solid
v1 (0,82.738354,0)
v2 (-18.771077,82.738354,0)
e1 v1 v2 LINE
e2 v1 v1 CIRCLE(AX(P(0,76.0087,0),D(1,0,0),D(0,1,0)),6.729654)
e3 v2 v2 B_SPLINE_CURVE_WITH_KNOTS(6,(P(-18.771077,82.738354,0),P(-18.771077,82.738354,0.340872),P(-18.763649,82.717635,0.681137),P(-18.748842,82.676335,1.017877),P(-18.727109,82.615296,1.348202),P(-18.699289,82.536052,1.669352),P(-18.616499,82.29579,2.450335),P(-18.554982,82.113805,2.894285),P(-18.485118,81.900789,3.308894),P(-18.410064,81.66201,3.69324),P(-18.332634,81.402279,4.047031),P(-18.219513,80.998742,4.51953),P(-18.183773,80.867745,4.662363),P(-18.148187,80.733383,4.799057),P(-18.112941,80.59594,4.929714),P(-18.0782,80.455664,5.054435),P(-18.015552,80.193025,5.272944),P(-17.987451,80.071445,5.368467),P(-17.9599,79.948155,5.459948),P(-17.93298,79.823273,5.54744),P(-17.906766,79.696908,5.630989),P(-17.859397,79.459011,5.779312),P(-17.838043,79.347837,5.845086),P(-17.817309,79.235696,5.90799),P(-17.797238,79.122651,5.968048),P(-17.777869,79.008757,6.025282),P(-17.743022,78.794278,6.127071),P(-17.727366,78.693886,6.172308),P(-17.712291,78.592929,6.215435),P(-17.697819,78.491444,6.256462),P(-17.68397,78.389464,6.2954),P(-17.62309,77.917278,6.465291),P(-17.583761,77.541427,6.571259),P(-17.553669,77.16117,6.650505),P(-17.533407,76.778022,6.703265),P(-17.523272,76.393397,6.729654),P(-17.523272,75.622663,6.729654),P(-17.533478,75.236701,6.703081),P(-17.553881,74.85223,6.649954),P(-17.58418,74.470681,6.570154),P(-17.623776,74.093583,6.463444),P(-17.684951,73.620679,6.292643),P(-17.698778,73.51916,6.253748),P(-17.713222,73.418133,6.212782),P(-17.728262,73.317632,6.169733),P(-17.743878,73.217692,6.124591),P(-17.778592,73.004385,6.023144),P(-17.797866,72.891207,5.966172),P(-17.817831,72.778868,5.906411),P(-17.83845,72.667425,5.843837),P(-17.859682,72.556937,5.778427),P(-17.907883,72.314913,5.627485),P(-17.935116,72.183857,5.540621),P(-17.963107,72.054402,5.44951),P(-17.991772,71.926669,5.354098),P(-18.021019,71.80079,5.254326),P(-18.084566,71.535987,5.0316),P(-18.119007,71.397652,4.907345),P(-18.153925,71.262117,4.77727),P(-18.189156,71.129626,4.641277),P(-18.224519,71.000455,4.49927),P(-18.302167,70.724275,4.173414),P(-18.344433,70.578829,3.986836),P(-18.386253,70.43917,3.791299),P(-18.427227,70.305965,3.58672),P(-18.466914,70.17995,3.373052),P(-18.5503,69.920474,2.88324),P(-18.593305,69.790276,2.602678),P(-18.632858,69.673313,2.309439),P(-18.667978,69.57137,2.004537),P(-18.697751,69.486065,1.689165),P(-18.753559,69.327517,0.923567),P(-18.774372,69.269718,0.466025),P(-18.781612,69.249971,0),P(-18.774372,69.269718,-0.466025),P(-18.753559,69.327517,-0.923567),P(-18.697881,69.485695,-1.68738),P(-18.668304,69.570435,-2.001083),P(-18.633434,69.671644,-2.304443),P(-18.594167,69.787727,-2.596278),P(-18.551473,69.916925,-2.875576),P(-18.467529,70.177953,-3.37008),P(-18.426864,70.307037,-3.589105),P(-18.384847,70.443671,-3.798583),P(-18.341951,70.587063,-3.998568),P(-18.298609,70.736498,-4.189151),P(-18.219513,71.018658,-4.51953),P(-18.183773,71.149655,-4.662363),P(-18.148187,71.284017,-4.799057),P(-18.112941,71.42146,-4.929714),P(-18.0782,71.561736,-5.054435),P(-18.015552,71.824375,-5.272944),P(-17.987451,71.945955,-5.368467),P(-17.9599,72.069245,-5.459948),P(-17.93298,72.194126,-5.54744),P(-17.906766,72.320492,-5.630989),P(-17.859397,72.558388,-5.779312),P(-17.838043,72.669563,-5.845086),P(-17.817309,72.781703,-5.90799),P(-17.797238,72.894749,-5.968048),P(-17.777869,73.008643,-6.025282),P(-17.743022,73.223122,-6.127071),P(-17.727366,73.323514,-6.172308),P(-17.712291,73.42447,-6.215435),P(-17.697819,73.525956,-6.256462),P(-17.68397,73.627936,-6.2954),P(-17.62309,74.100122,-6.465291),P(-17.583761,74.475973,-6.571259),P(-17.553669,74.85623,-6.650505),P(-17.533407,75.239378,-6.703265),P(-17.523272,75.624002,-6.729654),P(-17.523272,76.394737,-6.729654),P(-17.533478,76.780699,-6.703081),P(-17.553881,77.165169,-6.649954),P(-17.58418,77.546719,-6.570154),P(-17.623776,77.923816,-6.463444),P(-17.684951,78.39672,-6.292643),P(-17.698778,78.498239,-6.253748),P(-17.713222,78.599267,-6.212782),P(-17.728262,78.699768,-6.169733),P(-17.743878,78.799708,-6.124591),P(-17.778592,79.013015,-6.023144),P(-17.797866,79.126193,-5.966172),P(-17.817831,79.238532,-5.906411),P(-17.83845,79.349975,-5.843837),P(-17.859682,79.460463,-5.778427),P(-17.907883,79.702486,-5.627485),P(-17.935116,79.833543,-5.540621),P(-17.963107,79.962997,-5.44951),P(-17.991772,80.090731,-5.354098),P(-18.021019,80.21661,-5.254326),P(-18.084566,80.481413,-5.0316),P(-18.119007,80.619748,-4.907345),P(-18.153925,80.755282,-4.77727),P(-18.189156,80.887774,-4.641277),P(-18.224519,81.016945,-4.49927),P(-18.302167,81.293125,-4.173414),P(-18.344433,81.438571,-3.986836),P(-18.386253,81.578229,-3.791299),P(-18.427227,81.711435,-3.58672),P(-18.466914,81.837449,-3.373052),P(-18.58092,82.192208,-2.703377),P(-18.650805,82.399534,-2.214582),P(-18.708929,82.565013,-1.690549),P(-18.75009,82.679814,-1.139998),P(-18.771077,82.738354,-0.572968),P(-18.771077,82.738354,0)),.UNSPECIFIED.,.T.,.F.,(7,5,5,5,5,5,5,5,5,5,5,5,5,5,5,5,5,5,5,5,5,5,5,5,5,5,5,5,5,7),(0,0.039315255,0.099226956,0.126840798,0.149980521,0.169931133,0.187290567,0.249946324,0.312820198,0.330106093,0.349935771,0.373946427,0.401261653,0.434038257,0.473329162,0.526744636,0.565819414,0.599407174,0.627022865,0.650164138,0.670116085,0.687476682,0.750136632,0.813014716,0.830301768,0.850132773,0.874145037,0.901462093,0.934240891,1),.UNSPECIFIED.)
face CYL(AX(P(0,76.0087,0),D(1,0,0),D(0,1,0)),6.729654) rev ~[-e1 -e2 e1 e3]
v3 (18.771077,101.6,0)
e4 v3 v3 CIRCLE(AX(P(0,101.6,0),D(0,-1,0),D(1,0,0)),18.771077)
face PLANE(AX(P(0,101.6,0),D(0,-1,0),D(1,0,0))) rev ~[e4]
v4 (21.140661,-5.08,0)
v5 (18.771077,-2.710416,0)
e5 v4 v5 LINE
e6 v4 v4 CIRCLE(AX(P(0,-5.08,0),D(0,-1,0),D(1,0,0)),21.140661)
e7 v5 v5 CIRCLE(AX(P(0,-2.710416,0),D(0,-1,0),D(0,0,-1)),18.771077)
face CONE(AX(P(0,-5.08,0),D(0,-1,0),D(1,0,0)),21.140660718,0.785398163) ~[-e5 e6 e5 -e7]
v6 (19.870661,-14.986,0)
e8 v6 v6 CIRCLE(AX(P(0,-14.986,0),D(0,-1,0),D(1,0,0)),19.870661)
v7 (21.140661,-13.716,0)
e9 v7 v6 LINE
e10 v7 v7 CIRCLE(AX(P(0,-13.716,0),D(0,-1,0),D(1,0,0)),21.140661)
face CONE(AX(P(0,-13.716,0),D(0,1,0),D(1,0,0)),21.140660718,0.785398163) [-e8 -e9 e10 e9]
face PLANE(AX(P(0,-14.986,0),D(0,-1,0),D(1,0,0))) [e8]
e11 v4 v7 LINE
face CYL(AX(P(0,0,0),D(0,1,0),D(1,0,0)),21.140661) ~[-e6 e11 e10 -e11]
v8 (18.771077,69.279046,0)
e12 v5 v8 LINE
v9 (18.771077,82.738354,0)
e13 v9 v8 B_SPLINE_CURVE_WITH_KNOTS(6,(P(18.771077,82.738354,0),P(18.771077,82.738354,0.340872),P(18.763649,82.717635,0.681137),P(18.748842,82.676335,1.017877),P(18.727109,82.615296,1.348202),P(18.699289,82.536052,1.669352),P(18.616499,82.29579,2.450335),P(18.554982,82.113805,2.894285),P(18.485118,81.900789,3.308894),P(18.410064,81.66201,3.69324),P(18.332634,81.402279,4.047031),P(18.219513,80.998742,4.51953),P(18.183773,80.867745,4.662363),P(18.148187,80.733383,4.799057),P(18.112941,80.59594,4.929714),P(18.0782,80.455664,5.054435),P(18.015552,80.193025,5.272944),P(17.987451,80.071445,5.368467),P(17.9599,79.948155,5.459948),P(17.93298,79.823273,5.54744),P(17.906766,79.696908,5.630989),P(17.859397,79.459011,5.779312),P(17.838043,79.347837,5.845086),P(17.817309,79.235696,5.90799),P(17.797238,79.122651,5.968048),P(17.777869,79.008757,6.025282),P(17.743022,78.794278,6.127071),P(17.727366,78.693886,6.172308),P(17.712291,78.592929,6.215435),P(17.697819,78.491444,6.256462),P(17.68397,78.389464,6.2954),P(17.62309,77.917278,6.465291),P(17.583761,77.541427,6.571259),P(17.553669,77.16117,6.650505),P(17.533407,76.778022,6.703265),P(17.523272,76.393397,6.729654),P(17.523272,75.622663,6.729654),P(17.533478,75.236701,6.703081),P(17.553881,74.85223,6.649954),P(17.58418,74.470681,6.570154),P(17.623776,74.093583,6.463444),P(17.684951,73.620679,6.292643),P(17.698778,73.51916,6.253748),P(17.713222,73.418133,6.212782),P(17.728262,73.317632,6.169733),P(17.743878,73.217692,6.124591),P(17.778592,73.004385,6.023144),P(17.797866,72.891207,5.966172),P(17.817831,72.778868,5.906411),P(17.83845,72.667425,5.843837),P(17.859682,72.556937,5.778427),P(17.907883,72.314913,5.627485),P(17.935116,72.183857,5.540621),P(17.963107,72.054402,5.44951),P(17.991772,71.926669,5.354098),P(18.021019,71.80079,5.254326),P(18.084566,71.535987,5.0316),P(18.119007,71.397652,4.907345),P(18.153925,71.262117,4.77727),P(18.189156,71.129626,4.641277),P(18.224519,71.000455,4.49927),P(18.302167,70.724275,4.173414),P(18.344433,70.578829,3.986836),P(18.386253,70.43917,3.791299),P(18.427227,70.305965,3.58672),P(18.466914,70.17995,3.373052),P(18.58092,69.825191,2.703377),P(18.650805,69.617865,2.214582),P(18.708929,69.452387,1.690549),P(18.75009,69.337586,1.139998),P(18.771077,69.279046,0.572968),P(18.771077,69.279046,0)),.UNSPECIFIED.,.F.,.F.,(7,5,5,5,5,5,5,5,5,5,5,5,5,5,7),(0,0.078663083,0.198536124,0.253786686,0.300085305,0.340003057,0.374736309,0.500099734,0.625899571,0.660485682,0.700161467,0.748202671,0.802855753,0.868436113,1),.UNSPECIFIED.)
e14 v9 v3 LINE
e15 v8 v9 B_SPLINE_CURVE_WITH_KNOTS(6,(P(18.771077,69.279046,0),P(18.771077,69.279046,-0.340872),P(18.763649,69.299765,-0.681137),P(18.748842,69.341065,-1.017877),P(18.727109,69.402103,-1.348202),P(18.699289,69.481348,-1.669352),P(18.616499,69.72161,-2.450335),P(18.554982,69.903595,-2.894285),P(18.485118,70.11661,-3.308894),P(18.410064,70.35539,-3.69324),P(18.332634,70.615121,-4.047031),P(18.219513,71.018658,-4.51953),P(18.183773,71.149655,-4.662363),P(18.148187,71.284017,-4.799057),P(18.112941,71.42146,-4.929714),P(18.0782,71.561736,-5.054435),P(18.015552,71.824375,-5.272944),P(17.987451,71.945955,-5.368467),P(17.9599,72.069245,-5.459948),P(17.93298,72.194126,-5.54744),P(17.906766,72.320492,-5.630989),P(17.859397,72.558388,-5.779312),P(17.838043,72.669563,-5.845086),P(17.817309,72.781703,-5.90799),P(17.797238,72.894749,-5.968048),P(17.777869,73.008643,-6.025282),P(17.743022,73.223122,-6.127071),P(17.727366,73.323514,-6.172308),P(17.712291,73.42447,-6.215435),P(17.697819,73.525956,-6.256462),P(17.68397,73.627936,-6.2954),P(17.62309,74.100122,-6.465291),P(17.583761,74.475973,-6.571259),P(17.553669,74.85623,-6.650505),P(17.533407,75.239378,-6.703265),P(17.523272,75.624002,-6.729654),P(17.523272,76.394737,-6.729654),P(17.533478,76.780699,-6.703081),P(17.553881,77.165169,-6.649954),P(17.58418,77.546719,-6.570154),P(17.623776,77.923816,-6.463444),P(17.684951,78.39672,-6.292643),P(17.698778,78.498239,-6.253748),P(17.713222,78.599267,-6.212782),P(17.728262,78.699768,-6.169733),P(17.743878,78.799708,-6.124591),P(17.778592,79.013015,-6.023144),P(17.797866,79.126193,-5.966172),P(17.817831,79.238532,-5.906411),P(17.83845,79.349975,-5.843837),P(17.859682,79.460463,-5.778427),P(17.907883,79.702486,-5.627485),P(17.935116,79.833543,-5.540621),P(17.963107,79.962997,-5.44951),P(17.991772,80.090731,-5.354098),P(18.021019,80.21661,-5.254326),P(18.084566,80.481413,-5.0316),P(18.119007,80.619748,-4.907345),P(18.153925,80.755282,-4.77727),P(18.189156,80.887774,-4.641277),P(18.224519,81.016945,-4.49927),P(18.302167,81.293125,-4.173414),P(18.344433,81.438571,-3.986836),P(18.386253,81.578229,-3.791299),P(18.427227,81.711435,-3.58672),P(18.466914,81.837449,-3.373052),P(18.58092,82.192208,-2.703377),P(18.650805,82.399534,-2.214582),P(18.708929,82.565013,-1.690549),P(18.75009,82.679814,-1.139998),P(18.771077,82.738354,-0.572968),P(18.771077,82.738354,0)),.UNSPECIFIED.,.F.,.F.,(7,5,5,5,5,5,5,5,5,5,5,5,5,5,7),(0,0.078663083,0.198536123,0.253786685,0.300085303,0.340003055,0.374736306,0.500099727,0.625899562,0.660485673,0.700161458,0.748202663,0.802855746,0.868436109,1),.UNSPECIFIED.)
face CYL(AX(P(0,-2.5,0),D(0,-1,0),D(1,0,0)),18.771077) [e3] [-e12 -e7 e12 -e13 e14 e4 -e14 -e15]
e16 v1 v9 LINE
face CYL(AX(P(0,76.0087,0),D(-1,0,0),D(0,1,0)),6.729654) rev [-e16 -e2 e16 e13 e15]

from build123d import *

# Parameters (mm, degrees)
F0_R          = 18.7710767317
F1_DEPTH      = 101.6
F2_R          = 21.1406607176
F3_DEPTH      = 14.986
F4_S5_R       = 18.7710767317
F4_T6_DEPTH   = 32
F5_SIZE2      = 1.27
F5_SIZE       = 1.27
F6_R          = 6.7296542148
F7_DEPTH      = 47.498
F7_DEPTH_BACK = 25.4


# Not quite as in the source:
# - a fillet or chamfer that OpenCascade refuses, or shapes differently, is made with other operations: its cross-section is extruded or revolved along the edge and cut away or added


with BuildPart() as f1:
    # F0 (on Front) → F1 (new body)
    with BuildSketch(Plane.XZ):
        Circle(F0_R)
    extrude(amount=-F1_DEPTH)

    # F2 (on Front) → F3 (join)
    with BuildSketch(Plane.XZ):
        Circle(F2_R)
    extrude(amount=F3_DEPTH)

    # F4: chamfer of 5.08 on 1 edges, made by hand


with BuildPart() as f4_tool2:
    # F4_s3 → F4_t4 (revolve)
    with BuildSketch(Plane.XY):
        Polygon((21.1406607176, -5.08), (16.0606607176, 0), (21.1406607176, 0), align=None)
    revolve(axis=Axis((0, 0, 0), (0, -1, 0)))

    # F4_s5 → F4_t6 (cut, symmetric)
    with BuildSketch(Plane.XZ.offset(2.5)):
        Circle(F4_S5_R)
    extrude(amount=F4_T6_DEPTH, both=True, mode=Mode.SUBTRACT)


with BuildPart() as f1_1:
    add(f1.part)

    # F4_t1: cut F4_tool2
    add(f4_tool2.part, mode=Mode.SUBTRACT)

    # F5
    f5_edges = [f1_1.edges().sort_by_distance(p)[0] for p in [
        (-21.140661, -14.986, 0),
    ]]
    chamfer(f5_edges, length=F5_SIZE, length2=F5_SIZE2)

    # F6 (on Right) → F7 (cut, two sides)
    with BuildSketch(Plane.YZ) as f7_sk:
        with Locations((76.0086998343, 0)):
            Circle(F6_R)
    extrude(amount=F7_DEPTH, mode=Mode.SUBTRACT)
    extrude(f7_sk.sketch, amount=-F7_DEPTH_BACK, mode=Mode.SUBTRACT)


solid = f1_1.part
